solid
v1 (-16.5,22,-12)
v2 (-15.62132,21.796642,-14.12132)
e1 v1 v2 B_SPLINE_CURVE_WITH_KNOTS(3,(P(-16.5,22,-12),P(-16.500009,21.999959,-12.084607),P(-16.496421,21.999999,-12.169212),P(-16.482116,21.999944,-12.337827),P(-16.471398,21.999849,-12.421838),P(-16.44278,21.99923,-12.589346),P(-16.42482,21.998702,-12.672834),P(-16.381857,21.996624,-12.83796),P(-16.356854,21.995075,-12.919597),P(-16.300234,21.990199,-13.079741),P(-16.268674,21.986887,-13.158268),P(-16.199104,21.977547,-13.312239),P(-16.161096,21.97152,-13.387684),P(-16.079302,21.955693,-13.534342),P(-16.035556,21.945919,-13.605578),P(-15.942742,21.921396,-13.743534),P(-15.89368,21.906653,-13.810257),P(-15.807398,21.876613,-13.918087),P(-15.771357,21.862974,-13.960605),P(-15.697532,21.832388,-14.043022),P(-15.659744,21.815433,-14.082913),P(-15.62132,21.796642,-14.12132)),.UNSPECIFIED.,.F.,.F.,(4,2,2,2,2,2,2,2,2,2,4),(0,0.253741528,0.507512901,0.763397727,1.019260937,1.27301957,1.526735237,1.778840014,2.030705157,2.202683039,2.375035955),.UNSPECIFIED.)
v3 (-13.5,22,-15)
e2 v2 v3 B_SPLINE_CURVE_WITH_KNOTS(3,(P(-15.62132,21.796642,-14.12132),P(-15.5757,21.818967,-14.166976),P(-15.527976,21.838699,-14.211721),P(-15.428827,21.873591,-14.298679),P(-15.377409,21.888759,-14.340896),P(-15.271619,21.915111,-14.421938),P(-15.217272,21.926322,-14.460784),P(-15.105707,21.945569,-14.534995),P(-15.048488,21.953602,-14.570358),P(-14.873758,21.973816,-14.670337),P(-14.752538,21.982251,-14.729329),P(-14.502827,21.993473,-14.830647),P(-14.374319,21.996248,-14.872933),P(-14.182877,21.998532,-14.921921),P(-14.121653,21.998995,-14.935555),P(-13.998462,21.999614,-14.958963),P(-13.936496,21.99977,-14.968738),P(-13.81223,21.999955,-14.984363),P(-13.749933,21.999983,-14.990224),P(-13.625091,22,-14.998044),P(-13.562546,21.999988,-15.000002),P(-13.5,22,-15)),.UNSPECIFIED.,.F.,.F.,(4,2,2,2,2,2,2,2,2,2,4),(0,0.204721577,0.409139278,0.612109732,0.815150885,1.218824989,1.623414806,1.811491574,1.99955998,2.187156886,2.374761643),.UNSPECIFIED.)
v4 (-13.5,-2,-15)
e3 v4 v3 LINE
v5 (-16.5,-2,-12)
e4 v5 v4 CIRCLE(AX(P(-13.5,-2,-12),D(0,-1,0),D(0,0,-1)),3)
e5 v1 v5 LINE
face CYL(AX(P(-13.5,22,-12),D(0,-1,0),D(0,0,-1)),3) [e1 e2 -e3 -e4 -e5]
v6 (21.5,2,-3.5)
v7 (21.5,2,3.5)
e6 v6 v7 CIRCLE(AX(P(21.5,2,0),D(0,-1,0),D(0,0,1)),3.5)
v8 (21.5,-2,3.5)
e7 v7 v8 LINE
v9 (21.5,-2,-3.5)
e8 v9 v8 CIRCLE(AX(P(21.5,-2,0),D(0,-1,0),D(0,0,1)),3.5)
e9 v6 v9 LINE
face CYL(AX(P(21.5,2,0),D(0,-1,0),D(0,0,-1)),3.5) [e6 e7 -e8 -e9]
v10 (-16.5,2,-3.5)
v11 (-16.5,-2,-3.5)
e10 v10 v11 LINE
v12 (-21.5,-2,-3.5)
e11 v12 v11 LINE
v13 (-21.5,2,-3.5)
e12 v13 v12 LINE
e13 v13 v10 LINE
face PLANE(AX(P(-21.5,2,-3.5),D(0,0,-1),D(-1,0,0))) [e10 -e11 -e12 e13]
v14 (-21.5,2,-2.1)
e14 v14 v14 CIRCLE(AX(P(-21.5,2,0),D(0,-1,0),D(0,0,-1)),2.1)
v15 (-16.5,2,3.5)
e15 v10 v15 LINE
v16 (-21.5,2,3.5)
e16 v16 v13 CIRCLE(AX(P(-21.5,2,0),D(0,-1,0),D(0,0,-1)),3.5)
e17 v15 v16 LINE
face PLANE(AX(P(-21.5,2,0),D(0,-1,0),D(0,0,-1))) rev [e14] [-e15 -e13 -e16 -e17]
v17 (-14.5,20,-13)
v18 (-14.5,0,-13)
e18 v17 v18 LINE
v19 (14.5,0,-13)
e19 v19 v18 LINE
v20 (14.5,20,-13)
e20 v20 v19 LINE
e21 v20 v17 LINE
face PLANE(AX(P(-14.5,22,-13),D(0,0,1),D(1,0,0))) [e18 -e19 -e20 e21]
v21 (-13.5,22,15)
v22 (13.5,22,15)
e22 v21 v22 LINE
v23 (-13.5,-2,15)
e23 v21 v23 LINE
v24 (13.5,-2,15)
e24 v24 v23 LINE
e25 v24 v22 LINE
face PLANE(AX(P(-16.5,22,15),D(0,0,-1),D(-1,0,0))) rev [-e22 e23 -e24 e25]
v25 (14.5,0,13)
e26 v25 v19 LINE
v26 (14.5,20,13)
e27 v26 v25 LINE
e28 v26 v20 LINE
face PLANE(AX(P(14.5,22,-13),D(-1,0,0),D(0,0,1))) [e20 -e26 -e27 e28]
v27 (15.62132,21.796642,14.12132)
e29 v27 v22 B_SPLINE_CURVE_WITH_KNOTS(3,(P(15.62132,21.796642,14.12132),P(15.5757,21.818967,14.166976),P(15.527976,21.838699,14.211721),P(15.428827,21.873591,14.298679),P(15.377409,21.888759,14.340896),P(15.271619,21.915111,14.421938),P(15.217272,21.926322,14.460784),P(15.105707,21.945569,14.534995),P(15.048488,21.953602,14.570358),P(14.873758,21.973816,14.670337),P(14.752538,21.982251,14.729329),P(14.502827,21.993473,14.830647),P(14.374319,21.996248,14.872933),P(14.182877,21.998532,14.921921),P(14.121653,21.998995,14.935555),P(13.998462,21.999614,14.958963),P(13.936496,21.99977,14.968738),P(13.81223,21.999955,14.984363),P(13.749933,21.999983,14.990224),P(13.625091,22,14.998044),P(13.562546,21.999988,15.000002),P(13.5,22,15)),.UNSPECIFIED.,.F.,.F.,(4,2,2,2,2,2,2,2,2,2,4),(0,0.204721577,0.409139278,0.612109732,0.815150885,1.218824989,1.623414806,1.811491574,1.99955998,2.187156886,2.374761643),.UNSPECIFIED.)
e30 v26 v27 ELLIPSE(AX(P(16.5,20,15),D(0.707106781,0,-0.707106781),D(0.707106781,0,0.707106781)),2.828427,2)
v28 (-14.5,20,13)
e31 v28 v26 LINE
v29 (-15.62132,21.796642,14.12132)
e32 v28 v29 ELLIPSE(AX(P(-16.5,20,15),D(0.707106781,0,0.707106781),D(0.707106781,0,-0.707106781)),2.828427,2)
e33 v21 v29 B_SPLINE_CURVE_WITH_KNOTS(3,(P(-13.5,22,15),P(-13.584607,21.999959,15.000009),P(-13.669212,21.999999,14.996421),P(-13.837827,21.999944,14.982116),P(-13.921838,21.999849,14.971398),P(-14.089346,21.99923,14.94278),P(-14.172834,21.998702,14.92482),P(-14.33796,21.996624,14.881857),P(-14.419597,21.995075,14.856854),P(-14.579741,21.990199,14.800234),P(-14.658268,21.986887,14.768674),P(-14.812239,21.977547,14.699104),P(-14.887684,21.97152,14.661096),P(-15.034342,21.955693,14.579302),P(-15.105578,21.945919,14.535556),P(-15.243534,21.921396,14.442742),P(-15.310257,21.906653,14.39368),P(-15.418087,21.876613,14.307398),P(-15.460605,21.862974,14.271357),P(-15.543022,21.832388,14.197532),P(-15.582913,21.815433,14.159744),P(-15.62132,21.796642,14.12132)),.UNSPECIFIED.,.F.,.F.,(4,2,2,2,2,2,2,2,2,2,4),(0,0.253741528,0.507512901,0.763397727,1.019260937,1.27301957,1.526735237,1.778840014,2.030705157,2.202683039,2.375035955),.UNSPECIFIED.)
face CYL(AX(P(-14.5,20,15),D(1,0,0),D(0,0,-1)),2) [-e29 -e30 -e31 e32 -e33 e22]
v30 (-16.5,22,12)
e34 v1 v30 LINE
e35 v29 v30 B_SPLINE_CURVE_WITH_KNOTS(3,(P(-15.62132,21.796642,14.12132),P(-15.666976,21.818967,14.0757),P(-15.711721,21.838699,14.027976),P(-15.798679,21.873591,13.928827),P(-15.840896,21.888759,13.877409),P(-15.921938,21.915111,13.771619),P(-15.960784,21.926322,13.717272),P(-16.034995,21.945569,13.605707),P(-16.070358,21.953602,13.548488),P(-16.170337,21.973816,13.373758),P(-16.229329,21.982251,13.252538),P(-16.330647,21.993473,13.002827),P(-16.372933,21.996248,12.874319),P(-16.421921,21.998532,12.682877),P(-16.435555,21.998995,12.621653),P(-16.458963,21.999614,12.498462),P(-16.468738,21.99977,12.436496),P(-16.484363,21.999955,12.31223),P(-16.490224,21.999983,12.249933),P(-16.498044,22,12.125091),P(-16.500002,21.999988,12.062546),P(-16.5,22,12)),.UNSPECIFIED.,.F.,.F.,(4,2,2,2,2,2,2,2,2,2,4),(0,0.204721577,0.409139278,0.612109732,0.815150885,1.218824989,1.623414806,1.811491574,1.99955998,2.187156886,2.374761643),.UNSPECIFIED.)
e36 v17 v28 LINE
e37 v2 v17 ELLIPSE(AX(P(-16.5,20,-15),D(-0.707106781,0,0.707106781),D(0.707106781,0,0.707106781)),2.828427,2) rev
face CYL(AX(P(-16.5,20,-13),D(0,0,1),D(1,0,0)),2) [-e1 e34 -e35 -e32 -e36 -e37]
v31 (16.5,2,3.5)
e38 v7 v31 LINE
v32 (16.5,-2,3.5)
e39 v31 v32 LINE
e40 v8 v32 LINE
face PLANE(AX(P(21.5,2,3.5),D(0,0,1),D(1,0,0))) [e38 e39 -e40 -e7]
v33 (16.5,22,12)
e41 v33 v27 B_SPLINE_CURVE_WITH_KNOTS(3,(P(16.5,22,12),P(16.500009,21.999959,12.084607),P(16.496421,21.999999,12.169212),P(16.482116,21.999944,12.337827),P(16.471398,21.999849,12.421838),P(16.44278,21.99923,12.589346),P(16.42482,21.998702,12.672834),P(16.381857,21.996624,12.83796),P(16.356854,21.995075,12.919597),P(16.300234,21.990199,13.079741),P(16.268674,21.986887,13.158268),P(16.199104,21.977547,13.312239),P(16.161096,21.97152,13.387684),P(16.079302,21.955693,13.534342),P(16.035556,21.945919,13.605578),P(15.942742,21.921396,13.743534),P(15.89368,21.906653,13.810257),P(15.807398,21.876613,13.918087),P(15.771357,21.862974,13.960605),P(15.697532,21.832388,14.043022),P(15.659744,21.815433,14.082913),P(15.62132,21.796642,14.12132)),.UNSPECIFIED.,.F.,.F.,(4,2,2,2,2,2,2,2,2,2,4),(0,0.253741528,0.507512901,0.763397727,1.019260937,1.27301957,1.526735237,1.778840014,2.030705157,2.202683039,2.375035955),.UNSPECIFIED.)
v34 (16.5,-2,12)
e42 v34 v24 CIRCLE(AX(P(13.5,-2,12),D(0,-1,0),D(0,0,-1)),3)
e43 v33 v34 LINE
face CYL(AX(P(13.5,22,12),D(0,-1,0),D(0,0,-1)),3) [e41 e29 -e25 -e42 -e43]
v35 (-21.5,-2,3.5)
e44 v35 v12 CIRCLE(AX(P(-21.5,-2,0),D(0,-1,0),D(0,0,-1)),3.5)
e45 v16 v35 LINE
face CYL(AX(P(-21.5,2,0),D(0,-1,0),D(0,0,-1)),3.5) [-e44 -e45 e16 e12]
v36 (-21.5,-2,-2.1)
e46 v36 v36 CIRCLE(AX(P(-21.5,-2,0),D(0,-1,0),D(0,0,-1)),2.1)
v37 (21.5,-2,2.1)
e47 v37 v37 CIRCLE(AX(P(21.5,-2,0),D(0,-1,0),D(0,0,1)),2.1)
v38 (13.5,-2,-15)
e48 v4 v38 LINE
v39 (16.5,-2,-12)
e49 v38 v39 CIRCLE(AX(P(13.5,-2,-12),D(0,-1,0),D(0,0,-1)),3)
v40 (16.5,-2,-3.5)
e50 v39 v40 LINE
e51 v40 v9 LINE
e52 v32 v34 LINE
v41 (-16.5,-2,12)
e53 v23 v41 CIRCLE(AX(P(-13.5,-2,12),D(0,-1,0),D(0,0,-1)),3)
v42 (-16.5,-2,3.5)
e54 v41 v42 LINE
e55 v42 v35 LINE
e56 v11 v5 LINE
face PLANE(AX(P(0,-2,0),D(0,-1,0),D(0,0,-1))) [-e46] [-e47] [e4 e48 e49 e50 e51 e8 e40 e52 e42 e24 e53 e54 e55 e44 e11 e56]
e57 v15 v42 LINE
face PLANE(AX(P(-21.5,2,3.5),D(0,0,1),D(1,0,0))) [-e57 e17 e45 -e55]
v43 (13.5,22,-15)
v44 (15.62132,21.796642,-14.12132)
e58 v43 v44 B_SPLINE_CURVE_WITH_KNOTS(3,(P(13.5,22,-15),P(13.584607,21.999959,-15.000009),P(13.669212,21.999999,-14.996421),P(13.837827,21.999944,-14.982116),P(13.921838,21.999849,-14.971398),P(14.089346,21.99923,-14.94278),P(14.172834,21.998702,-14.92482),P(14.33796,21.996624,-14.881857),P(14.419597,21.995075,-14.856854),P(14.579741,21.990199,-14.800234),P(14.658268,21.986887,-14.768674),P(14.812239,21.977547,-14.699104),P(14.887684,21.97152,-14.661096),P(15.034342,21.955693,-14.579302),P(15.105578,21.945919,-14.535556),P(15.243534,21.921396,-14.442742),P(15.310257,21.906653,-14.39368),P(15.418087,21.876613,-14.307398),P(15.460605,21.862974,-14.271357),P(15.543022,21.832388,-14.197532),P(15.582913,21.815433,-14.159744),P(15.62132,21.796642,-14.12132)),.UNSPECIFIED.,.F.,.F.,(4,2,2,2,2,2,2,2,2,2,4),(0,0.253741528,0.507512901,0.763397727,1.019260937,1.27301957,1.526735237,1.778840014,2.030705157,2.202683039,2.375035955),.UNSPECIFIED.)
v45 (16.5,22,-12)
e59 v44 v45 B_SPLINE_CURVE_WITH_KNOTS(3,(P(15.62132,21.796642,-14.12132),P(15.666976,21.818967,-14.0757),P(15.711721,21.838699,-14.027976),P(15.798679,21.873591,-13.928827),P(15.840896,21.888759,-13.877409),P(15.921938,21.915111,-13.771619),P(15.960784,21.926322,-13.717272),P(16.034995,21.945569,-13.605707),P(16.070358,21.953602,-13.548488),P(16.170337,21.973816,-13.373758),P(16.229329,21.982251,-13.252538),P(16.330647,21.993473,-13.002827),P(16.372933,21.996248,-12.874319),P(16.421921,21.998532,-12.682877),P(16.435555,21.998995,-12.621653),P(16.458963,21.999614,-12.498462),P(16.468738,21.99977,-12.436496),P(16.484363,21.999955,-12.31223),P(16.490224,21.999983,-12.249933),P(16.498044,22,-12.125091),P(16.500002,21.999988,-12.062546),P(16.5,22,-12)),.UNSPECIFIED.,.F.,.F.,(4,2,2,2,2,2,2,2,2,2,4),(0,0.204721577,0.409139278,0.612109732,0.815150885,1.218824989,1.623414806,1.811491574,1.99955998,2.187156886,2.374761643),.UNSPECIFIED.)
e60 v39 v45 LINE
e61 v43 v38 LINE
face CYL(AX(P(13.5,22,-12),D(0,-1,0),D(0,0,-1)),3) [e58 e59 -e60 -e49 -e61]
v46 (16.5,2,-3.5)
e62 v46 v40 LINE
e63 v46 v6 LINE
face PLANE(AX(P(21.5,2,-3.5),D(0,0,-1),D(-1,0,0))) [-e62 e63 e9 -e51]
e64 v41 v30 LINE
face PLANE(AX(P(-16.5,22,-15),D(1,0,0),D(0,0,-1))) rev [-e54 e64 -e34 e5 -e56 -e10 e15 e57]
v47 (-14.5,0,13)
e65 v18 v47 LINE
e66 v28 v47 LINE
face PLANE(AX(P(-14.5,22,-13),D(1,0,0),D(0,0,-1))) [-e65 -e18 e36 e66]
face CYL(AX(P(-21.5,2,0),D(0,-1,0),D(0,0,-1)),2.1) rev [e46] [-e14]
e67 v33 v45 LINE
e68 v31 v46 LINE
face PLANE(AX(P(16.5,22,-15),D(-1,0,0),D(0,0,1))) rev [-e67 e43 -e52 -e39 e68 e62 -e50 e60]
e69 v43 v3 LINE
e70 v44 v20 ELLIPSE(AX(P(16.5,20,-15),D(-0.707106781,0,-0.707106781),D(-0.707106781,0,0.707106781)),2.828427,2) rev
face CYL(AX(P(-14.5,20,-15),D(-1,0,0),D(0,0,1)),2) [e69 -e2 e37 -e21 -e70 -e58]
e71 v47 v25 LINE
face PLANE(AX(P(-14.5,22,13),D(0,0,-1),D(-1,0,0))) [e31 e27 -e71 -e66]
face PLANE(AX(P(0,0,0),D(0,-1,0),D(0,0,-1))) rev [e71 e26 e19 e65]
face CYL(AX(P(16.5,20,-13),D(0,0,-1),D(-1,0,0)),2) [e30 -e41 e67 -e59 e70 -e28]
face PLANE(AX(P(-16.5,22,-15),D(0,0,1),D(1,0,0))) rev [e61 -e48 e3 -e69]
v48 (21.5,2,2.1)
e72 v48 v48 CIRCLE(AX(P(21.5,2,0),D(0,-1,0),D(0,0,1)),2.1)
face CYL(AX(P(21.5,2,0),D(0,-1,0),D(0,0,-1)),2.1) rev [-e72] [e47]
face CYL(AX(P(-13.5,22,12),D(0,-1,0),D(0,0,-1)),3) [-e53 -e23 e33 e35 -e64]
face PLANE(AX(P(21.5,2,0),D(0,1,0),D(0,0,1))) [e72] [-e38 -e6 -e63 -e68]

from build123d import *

# Parameters (mm, degrees)
SKETCH2_W           = 33
SKETCH2_H           = 30
SKETCH2_W_2         = 29
SKETCH2_H_2         = 26
BOSS_EXTRUDE1_DEPTH = 22
SKETCH3_W           = 33
SKETCH3_H           = 30
BOSS_EXTRUDE2_DEPTH = 2
SKETCH4_R           = 2.1
BOSS_EXTRUDE3_DEPTH = 4
FILLET1_R           = 3
FILLET2_R           = 2


with BuildPart() as part:
    # Sketch2 → Boss-Extrude1 (new body)
    with BuildSketch(Plane(origin=(0, 0, 0), x_dir=(1, 0, 0), z_dir=(0, 1, 0))):
        Rectangle(SKETCH2_W, SKETCH2_H)
        Rectangle(SKETCH2_W_2, SKETCH2_H_2, mode=Mode.SUBTRACT)
    extrude(amount=BOSS_EXTRUDE1_DEPTH)

    # Sketch3 → Boss-Extrude2 (add)
    with BuildSketch(Plane.XZ):
        Rectangle(SKETCH3_W, SKETCH3_H)
    extrude(amount=BOSS_EXTRUDE2_DEPTH)

    # Sketch4 → Boss-Extrude3 (add)
    # profile 1 of 2: a face of its own
    with BuildSketch(Plane.XZ.offset(2)):
        with BuildLine():
            Line((-21.5, 3.5), (-16.5, 3.5))
            Line((-16.5, 3.5), (-16.5, -3.5))
            Line((-16.5, -3.5), (-21.5, -3.5))
            ThreePointArc((-21.5, -3.5), (-25, 0), (-21.5, 3.5))
        make_face()
        with Locations(Location((-21.5, 0, 0), (0, 0, 270))):
            Circle(SKETCH4_R, mode=Mode.SUBTRACT)
    # profile 2 of 2: a face of its own
    with BuildSketch(Plane.XZ.offset(2)):
        with BuildLine():
            Line((16.5, 3.5), (16.5, -3.5))
            Line((16.5, -3.5), (21.5, -3.5))
            ThreePointArc((21.5, -3.5), (25, 0), (21.5, 3.5))
            Line((21.5, 3.5), (16.5, 3.5))
        make_face()
        with Locations(Location((21.5, 0, 0), (0, 0, 90))):
            Circle(SKETCH4_R, mode=Mode.SUBTRACT)
    extrude(amount=-BOSS_EXTRUDE3_DEPTH)

    # Fillet1
    fillet1_edges = [part.edges().sort_by_distance(p)[0] for p in [
        (16.5, 10, 15),
        (-16.5, 10, 15),
        (-16.5, 10, -15),
        (16.5, 10, -15),
    ]]
    fillet(fillet1_edges, radius=FILLET1_R)

    # Fillet2
    # the kernel refuses this fillet: 2 mm, written as the material it takes off along each edge
    with BuildSketch(Plane(origin=(14.5, 22, -13), x_dir=(1, 0, 0), z_dir=(0, 0, 1)), Plane(origin=(-14.5, 22, 13), x_dir=(-1, 0, 0), z_dir=(0, 0, -1))) as fillet2_piece_1:
        with BuildLine():
            CenterArc((FILLET2_R, -FILLET2_R), FILLET2_R, 90, 90)
            Line((0, -FILLET2_R), (-FILLET2_R * 0.02, -FILLET2_R))
            Line((-FILLET2_R * 0.02, -FILLET2_R), (-FILLET2_R * 0.02, FILLET2_R * 0.02))
            Line((-FILLET2_R * 0.02, FILLET2_R * 0.02), (FILLET2_R, FILLET2_R * 0.02))
            Line((FILLET2_R, FILLET2_R * 0.02), (FILLET2_R, 0))
        make_face()
    extrude(amount=26, mode=Mode.SUBTRACT)
    with BuildSketch(Plane(origin=(-14.5, 22, -13), x_dir=(0, 0, -1), z_dir=(1, 0, 0)), Plane(origin=(14.5, 22, 13), x_dir=(0, 0, 1), z_dir=(-1, 0, 0))) as fillet2_piece_2:
        with BuildLine():
            CenterArc((FILLET2_R, -FILLET2_R), FILLET2_R, 90, 90)
            Line((0, -FILLET2_R), (-FILLET2_R * 0.02, -FILLET2_R))
            Line((-FILLET2_R * 0.02, -FILLET2_R), (-FILLET2_R * 0.02, FILLET2_R * 0.02))
            Line((-FILLET2_R * 0.02, FILLET2_R * 0.02), (FILLET2_R, FILLET2_R * 0.02))
            Line((FILLET2_R, FILLET2_R * 0.02), (FILLET2_R, 0))
        make_face()
    extrude(amount=29, mode=Mode.SUBTRACT)
    with BuildSketch(Plane(origin=(14.5, 22, -18), x_dir=(1, 0, 0), z_dir=(0, 0, 1))) as fillet2_piece_3a_section:
        with BuildLine():
            CenterArc((FILLET2_R, -FILLET2_R), FILLET2_R, 90, 90)
            Line((0, -FILLET2_R), (-FILLET2_R * 0.02, -FILLET2_R))
            Line((-FILLET2_R * 0.02, -FILLET2_R), (-FILLET2_R * 0.02, FILLET2_R * 0.02))
            Line((-FILLET2_R * 0.02, FILLET2_R * 0.02), (FILLET2_R, FILLET2_R * 0.02))
            Line((FILLET2_R, FILLET2_R * 0.02), (FILLET2_R, 0))
        make_face()
    fillet2_piece_3a = extrude(amount=31, mode=Mode.PRIVATE)
    fillet2_piece_3a = split(fillet2_piece_3a, bisect_by=Plane(origin=(14.952790229, 21.547209771, -13), z_dir=(0, 0, -1)), keep=Keep.TOP, mode=Mode.PRIVATE)
    with BuildSketch(Plane(origin=(-14.5, 22, -13), x_dir=(0, 0, -1), z_dir=(1, 0, 0))) as fillet2_piece_3b_section:
        with BuildLine():
            CenterArc((FILLET2_R, -FILLET2_R), FILLET2_R, 90, 90)
            Line((0, -FILLET2_R), (-FILLET2_R * 0.02, -FILLET2_R))
            Line((-FILLET2_R * 0.02, -FILLET2_R), (-FILLET2_R * 0.02, FILLET2_R * 0.02))
            Line((-FILLET2_R * 0.02, FILLET2_R * 0.02), (FILLET2_R, FILLET2_R * 0.02))
            Line((FILLET2_R, FILLET2_R * 0.02), (FILLET2_R, 0))
        make_face()
    fillet2_piece_3b = extrude(amount=34, mode=Mode.PRIVATE)
    fillet2_piece_3b = split(fillet2_piece_3b, bisect_by=Plane(origin=(14.5, 21.547209771, -13.452790229), z_dir=(1, 0, 0)), keep=Keep.TOP, mode=Mode.PRIVATE)
    fillet2_piece_3 = fillet2_piece_3a & fillet2_piece_3b
    add(fillet2_piece_3, mode=Mode.SUBTRACT)
    with BuildSketch(Plane(origin=(19.5, 22, 13), x_dir=(0, 0, 1), z_dir=(-1, 0, 0))) as fillet2_piece_4a_section:
        with BuildLine():
            CenterArc((FILLET2_R, -FILLET2_R), FILLET2_R, 90, 90)
            Line((0, -FILLET2_R), (-FILLET2_R * 0.02, -FILLET2_R))
            Line((-FILLET2_R * 0.02, -FILLET2_R), (-FILLET2_R * 0.02, FILLET2_R * 0.02))
            Line((-FILLET2_R * 0.02, FILLET2_R * 0.02), (FILLET2_R, FILLET2_R * 0.02))
            Line((FILLET2_R, FILLET2_R * 0.02), (FILLET2_R, 0))
        make_face()
    fillet2_piece_4a = extrude(amount=34, mode=Mode.PRIVATE)
    fillet2_piece_4a = split(fillet2_piece_4a, bisect_by=Plane(origin=(14.5, 21.547209771, 13.452790229), z_dir=(1, 0, 0)), keep=Keep.TOP, mode=Mode.PRIVATE)
    with BuildSketch(Plane(origin=(14.5, 22, -13), x_dir=(1, 0, 0), z_dir=(0, 0, 1))) as fillet2_piece_4b_section:
        with BuildLine():
            CenterArc((FILLET2_R, -FILLET2_R), FILLET2_R, 90, 90)
            Line((0, -FILLET2_R), (-FILLET2_R * 0.02, -FILLET2_R))
            Line((-FILLET2_R * 0.02, -FILLET2_R), (-FILLET2_R * 0.02, FILLET2_R * 0.02))
            Line((-FILLET2_R * 0.02, FILLET2_R * 0.02), (FILLET2_R, FILLET2_R * 0.02))
            Line((FILLET2_R, FILLET2_R * 0.02), (FILLET2_R, 0))
        make_face()
    fillet2_piece_4b = extrude(amount=31, mode=Mode.PRIVATE)
    fillet2_piece_4b = split(fillet2_piece_4b, bisect_by=Plane(origin=(14.952790229, 21.547209771, 13), z_dir=(0, 0, 1)), keep=Keep.TOP, mode=Mode.PRIVATE)
    fillet2_piece_4 = fillet2_piece_4a & fillet2_piece_4b
    add(fillet2_piece_4, mode=Mode.SUBTRACT)
    with BuildSketch(Plane(origin=(-14.5, 22, 13), x_dir=(-1, 0, 0), z_dir=(0, 0, -1))) as fillet2_piece_5a_section:
        with BuildLine():
            CenterArc((FILLET2_R, -FILLET2_R), FILLET2_R, 90, 90)
            Line((0, -FILLET2_R), (-FILLET2_R * 0.02, -FILLET2_R))
            Line((-FILLET2_R * 0.02, -FILLET2_R), (-FILLET2_R * 0.02, FILLET2_R * 0.02))
            Line((-FILLET2_R * 0.02, FILLET2_R * 0.02), (FILLET2_R, FILLET2_R * 0.02))
            Line((FILLET2_R, FILLET2_R * 0.02), (FILLET2_R, 0))
        make_face()
    fillet2_piece_5a = extrude(amount=31, mode=Mode.PRIVATE)
    fillet2_piece_5a = split(fillet2_piece_5a, bisect_by=Plane(origin=(-14.952790229, 21.547209771, -13), z_dir=(0, 0, -1)), keep=Keep.TOP, mode=Mode.PRIVATE)
    with BuildSketch(Plane(origin=(-19.5, 22, -13), x_dir=(0, 0, -1), z_dir=(1, 0, 0))) as fillet2_piece_5b_section:
        with BuildLine():
            CenterArc((FILLET2_R, -FILLET2_R), FILLET2_R, 90, 90)
            Line((0, -FILLET2_R), (-FILLET2_R * 0.02, -FILLET2_R))
            Line((-FILLET2_R * 0.02, -FILLET2_R), (-FILLET2_R * 0.02, FILLET2_R * 0.02))
            Line((-FILLET2_R * 0.02, FILLET2_R * 0.02), (FILLET2_R, FILLET2_R * 0.02))
            Line((FILLET2_R, FILLET2_R * 0.02), (FILLET2_R, 0))
        make_face()
    fillet2_piece_5b = extrude(amount=34, mode=Mode.PRIVATE)
    fillet2_piece_5b = split(fillet2_piece_5b, bisect_by=Plane(origin=(-14.5, 21.547209771, -13.452790229), z_dir=(-1, 0, 0)), keep=Keep.TOP, mode=Mode.PRIVATE)
    fillet2_piece_5 = fillet2_piece_5a & fillet2_piece_5b
    add(fillet2_piece_5, mode=Mode.SUBTRACT)
    with BuildSketch(Plane(origin=(-14.5, 22, 18), x_dir=(-1, 0, 0), z_dir=(0, 0, -1))) as fillet2_piece_6a_section:
        with BuildLine():
            CenterArc((FILLET2_R, -FILLET2_R), FILLET2_R, 90, 90)
            Line((0, -FILLET2_R), (-FILLET2_R * 0.02, -FILLET2_R))
            Line((-FILLET2_R * 0.02, -FILLET2_R), (-FILLET2_R * 0.02, FILLET2_R * 0.02))
            Line((-FILLET2_R * 0.02, FILLET2_R * 0.02), (FILLET2_R, FILLET2_R * 0.02))
            Line((FILLET2_R, FILLET2_R * 0.02), (FILLET2_R, 0))
        make_face()
    fillet2_piece_6a = extrude(amount=31, mode=Mode.PRIVATE)
    fillet2_piece_6a = split(fillet2_piece_6a, bisect_by=Plane(origin=(-14.952790229, 21.547209771, 13), z_dir=(0, 0, 1)), keep=Keep.TOP, mode=Mode.PRIVATE)
    with BuildSketch(Plane(origin=(14.5, 22, 13), x_dir=(0, 0, 1), z_dir=(-1, 0, 0))) as fillet2_piece_6b_section:
        with BuildLine():
            CenterArc((FILLET2_R, -FILLET2_R), FILLET2_R, 90, 90)
            Line((0, -FILLET2_R), (-FILLET2_R * 0.02, -FILLET2_R))
            Line((-FILLET2_R * 0.02, -FILLET2_R), (-FILLET2_R * 0.02, FILLET2_R * 0.02))
            Line((-FILLET2_R * 0.02, FILLET2_R * 0.02), (FILLET2_R, FILLET2_R * 0.02))
            Line((FILLET2_R, FILLET2_R * 0.02), (FILLET2_R, 0))
        make_face()
    fillet2_piece_6b = extrude(amount=34, mode=Mode.PRIVATE)
    fillet2_piece_6b = split(fillet2_piece_6b, bisect_by=Plane(origin=(-14.5, 21.547209771, 13.452790229), z_dir=(-1, 0, 0)), keep=Keep.TOP, mode=Mode.PRIVATE)
    fillet2_piece_6 = fillet2_piece_6a & fillet2_piece_6b
    add(fillet2_piece_6, mode=Mode.SUBTRACT)


solid = part.part
